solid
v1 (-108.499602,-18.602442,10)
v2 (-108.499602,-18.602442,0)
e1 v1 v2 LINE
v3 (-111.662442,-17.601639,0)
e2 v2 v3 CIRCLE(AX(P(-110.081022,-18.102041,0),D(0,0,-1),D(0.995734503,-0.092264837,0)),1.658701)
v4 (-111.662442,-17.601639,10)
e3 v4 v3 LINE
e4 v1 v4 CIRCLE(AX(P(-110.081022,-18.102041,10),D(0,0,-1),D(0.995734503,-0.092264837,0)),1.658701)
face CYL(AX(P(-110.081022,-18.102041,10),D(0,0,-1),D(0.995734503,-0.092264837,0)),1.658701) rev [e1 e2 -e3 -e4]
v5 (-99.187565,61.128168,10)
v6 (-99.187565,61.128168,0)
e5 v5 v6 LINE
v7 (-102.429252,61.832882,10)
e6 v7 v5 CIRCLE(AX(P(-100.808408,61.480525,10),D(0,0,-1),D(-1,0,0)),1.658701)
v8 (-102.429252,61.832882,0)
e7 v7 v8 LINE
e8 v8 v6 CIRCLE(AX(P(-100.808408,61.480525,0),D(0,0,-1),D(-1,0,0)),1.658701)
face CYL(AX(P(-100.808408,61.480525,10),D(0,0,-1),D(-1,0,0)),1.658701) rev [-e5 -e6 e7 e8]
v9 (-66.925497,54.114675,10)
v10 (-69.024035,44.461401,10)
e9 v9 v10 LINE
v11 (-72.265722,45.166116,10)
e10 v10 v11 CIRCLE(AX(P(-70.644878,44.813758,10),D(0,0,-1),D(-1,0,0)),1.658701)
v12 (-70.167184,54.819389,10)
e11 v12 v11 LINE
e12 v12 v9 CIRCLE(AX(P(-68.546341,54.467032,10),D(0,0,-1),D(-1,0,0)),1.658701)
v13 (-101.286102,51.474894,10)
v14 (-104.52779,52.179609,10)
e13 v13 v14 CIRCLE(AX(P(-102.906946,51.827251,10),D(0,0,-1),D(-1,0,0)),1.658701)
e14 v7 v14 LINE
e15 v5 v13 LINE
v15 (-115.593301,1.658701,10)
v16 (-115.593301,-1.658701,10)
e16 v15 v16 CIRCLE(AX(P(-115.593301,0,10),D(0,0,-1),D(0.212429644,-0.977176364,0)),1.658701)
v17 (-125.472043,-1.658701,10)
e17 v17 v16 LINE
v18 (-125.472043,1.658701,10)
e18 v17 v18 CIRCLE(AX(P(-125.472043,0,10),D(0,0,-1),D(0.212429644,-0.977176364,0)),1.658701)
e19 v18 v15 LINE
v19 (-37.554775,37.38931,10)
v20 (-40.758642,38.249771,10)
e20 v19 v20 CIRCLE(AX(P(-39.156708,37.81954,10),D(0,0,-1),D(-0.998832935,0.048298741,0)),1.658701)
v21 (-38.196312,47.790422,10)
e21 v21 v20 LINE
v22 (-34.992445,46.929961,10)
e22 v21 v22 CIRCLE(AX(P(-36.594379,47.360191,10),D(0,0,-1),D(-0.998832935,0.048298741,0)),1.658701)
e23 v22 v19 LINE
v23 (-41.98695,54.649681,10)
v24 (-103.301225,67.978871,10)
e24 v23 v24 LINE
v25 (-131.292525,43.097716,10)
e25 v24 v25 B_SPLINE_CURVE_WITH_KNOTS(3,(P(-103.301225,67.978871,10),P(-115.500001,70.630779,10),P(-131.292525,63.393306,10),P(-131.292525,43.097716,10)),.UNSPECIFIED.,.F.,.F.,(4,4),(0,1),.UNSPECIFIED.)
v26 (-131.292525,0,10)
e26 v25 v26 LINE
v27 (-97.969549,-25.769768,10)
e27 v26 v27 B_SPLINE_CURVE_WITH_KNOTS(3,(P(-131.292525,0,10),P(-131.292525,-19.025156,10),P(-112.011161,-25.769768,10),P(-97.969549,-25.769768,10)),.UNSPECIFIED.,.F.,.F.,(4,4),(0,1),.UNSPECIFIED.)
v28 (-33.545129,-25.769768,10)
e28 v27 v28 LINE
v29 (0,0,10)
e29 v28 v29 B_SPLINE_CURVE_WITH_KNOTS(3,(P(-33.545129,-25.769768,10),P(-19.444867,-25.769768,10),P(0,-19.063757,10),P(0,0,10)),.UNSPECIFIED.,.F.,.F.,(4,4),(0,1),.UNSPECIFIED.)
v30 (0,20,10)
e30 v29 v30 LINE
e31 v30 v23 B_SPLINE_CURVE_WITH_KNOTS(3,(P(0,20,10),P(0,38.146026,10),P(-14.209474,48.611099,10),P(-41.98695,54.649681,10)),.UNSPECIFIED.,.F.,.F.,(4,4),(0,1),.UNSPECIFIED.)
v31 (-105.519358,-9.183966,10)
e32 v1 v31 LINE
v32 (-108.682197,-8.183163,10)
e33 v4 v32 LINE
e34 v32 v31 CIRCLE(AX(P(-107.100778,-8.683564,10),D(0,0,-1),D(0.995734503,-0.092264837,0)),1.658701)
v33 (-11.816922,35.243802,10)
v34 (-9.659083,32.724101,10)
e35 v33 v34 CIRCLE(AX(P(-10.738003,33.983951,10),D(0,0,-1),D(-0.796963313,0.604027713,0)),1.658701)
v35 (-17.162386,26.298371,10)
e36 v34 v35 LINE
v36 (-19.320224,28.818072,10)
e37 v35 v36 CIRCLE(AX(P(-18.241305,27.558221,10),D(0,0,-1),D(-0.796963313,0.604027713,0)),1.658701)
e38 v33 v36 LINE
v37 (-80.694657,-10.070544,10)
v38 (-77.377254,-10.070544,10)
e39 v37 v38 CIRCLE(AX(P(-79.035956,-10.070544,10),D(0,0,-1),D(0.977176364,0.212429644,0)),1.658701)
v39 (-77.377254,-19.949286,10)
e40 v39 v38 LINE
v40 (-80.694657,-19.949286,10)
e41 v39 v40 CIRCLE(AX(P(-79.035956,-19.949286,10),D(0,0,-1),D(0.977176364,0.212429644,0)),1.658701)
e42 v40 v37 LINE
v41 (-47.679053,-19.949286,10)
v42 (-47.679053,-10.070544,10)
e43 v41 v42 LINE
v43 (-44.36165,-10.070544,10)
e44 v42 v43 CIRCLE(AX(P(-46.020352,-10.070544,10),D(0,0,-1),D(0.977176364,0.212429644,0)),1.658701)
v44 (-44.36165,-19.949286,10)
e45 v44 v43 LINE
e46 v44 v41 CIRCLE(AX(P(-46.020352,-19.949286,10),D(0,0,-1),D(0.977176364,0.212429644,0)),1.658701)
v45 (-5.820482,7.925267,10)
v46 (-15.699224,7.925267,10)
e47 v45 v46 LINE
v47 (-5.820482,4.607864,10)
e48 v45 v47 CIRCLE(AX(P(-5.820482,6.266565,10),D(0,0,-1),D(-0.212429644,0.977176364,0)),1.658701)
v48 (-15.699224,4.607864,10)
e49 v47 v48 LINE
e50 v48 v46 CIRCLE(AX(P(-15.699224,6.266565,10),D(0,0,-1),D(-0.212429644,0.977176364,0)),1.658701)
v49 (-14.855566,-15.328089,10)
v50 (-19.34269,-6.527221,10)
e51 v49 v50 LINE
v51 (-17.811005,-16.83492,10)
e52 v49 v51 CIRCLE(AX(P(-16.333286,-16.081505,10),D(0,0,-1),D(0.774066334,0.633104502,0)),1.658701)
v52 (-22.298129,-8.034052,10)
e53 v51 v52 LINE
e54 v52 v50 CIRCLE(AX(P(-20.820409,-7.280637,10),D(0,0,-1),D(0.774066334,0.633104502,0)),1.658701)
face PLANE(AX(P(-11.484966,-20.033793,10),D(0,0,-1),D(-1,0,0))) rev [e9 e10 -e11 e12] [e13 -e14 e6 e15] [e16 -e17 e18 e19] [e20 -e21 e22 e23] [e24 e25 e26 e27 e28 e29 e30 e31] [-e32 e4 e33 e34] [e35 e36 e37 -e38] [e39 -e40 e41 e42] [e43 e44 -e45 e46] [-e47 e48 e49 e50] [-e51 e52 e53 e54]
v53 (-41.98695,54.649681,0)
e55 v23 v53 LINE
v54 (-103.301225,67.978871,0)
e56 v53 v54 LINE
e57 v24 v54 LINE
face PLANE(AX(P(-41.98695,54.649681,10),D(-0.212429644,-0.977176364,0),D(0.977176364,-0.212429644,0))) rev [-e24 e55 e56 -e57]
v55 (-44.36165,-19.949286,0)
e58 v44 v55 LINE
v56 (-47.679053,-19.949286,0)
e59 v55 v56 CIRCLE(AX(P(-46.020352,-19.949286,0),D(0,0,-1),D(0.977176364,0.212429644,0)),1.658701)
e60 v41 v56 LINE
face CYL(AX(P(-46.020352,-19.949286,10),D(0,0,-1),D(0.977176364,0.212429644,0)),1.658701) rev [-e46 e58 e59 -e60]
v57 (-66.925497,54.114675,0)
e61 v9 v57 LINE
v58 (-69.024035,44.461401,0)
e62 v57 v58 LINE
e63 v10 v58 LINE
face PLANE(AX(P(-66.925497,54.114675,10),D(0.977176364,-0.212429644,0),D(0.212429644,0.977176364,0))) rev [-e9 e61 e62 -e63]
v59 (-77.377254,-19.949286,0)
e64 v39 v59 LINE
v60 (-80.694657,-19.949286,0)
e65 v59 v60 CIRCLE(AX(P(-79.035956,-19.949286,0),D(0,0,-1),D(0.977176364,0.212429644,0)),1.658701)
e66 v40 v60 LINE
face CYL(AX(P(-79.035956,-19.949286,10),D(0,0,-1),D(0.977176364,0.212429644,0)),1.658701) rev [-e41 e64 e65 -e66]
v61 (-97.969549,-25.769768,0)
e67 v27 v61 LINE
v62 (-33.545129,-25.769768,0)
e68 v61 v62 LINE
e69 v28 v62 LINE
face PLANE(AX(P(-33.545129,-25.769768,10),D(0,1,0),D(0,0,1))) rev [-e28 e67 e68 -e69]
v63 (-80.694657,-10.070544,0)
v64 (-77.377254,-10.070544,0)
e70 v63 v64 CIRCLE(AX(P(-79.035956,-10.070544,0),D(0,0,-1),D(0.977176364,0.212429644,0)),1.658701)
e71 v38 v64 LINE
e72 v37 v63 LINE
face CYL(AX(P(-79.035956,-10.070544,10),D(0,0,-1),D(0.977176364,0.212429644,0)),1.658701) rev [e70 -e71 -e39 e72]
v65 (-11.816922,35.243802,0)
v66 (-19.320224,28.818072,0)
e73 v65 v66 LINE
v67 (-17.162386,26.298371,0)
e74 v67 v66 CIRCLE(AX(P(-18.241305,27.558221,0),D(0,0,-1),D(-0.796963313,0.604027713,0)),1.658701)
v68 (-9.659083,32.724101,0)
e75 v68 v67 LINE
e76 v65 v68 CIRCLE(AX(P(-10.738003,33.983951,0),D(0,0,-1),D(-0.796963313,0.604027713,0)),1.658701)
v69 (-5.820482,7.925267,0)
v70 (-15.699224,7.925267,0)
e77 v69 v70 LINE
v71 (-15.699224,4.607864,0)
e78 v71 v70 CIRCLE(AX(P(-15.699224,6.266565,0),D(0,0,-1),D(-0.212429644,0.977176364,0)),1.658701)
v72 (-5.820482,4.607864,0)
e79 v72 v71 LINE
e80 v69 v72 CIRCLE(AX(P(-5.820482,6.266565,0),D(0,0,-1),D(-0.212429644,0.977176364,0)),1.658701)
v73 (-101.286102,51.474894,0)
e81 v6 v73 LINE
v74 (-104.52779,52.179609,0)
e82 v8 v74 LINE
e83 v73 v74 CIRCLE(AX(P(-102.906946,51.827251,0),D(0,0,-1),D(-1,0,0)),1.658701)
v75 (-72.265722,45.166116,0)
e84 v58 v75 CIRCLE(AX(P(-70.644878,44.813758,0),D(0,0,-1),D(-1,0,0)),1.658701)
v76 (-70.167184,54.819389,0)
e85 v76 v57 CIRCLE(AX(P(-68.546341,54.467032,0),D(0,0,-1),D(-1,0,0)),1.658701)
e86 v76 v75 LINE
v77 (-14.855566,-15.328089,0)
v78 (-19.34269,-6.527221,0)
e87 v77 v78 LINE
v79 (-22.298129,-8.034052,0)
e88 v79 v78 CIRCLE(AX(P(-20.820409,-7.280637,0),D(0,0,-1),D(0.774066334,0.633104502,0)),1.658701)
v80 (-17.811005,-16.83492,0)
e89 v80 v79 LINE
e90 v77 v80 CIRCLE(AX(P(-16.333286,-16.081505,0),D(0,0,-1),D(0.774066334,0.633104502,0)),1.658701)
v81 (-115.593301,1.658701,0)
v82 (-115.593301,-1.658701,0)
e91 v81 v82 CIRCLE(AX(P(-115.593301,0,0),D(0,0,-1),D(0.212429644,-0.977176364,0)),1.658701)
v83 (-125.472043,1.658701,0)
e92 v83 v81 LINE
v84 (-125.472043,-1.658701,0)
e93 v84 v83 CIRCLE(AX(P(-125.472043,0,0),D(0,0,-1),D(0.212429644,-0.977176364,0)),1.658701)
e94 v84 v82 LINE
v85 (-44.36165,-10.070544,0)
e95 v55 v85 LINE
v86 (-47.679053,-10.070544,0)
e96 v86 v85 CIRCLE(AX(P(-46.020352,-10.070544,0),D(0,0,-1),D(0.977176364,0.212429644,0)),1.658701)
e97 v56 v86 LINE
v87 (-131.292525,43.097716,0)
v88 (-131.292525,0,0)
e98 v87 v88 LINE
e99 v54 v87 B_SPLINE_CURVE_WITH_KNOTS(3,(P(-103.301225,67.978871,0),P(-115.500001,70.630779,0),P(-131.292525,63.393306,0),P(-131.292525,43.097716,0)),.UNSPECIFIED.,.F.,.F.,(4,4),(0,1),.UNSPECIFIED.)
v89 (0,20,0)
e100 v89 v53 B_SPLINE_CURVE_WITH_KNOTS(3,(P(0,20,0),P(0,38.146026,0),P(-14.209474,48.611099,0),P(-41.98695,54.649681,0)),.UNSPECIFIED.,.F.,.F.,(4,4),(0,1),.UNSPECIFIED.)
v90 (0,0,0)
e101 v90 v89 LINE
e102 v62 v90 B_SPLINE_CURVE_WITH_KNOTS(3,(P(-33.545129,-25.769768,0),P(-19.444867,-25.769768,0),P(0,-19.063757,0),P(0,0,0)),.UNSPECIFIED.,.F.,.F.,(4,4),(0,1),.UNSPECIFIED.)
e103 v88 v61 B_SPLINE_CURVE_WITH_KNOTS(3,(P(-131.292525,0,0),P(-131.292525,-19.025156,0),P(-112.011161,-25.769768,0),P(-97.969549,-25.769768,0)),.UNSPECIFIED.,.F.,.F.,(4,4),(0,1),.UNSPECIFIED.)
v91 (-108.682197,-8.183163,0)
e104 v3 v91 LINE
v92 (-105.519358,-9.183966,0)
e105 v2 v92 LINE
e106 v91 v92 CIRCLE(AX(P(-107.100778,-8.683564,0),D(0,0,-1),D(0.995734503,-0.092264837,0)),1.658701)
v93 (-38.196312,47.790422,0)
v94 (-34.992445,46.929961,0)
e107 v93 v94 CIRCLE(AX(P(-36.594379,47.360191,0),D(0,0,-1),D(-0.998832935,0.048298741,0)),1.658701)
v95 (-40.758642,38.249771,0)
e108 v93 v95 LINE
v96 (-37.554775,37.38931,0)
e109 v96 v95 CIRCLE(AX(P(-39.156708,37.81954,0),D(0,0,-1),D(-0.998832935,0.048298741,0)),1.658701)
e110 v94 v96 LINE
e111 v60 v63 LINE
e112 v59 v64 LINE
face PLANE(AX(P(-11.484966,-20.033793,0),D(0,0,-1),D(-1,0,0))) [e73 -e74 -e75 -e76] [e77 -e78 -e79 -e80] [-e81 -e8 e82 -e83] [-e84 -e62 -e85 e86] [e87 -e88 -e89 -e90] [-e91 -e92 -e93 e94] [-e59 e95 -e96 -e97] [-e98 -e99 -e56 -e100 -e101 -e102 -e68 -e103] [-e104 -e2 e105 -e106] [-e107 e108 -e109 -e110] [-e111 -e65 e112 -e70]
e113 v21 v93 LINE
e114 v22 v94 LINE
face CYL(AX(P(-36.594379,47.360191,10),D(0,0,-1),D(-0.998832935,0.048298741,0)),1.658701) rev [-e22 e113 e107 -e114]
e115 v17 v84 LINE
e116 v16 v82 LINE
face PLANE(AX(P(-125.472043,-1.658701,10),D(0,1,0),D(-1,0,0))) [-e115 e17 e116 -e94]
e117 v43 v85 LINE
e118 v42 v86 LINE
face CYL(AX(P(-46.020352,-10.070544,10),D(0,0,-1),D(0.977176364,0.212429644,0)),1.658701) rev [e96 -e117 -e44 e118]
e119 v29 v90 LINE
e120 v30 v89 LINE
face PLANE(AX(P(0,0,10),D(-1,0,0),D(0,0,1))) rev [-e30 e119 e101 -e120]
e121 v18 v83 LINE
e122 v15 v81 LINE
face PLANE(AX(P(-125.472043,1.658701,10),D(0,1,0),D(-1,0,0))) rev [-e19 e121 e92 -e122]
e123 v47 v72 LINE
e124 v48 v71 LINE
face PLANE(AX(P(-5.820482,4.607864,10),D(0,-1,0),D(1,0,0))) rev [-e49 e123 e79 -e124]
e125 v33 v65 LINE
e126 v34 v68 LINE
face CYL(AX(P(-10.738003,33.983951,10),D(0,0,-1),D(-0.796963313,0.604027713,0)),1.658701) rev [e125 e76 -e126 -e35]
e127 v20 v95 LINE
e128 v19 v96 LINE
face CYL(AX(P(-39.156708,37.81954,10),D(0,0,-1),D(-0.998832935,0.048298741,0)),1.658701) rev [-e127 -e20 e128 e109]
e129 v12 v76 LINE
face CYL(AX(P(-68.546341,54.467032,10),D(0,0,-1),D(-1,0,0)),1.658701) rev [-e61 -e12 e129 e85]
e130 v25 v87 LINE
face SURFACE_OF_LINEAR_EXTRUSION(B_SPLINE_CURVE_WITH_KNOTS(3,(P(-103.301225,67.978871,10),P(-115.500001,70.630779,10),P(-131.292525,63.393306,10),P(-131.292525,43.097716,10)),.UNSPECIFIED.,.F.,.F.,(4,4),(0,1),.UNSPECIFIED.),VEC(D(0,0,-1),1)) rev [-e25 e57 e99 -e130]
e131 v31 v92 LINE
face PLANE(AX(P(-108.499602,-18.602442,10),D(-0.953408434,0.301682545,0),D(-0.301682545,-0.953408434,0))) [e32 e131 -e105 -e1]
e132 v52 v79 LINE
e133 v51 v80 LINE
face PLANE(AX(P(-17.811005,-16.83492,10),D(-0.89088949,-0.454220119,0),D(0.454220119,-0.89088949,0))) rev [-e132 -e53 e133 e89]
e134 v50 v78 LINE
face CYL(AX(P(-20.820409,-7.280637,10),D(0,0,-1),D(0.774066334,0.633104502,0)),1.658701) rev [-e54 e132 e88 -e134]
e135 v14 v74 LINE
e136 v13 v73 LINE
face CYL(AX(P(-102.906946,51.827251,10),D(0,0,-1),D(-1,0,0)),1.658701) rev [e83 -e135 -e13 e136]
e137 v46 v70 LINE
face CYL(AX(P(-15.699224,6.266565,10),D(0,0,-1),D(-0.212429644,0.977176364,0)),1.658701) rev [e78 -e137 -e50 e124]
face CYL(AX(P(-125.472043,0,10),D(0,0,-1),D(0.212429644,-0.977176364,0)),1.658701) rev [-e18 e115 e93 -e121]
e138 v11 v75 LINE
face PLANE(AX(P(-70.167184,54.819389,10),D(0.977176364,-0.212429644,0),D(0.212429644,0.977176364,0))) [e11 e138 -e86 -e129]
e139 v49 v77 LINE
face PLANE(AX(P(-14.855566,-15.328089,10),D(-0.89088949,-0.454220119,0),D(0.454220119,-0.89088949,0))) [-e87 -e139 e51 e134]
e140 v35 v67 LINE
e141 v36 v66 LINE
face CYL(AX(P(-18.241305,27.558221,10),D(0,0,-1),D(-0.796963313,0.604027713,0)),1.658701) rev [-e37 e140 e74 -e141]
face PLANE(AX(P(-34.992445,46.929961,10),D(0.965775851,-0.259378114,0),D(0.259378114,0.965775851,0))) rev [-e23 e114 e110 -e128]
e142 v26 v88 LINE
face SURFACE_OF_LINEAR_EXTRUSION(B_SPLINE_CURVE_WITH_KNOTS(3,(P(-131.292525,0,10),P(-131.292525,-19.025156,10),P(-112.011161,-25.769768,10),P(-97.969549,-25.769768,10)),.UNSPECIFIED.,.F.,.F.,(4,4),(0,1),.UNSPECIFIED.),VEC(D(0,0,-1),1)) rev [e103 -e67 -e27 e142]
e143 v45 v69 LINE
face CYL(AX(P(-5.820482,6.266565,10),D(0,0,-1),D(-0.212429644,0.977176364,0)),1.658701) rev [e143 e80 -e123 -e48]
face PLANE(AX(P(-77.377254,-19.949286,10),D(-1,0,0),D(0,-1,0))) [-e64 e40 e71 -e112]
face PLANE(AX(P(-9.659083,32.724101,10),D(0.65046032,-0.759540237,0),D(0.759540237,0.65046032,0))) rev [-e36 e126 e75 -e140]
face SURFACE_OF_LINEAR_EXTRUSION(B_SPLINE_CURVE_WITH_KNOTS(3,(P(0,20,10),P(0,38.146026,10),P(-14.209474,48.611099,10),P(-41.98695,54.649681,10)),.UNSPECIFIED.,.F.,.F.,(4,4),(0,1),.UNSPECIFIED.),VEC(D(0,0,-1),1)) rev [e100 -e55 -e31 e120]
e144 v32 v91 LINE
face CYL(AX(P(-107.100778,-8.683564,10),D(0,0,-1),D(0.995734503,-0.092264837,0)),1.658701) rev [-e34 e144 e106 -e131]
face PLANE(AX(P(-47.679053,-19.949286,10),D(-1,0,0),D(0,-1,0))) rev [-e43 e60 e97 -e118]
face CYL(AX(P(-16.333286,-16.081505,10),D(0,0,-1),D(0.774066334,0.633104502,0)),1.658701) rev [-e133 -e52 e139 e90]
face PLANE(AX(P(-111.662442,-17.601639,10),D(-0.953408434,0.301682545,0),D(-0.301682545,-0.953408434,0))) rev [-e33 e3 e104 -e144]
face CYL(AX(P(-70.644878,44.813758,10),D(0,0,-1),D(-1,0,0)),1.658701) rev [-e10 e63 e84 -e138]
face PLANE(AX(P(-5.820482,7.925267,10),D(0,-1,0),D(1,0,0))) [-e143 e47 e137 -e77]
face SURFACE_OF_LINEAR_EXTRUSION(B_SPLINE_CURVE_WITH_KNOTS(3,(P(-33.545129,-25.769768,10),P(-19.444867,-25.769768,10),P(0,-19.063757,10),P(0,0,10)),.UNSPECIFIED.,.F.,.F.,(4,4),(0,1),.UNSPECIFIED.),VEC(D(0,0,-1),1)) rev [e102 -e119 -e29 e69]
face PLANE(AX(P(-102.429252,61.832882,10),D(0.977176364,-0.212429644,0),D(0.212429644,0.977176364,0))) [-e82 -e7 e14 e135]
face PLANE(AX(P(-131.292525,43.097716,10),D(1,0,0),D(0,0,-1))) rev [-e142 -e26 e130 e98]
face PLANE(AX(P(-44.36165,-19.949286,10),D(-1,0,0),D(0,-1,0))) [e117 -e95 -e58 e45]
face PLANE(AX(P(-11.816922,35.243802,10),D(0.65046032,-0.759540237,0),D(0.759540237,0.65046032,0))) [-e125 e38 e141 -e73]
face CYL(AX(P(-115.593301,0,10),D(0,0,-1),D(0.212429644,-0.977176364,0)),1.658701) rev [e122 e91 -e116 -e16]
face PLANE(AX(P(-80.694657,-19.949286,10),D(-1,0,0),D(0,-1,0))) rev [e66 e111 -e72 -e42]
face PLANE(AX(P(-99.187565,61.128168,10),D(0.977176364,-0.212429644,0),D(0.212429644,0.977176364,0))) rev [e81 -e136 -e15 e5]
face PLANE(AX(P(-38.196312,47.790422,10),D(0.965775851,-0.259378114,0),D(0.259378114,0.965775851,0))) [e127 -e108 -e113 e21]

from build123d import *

# Parameters (mm, degrees)
EXTRUDE_1_DEPTH       = 10
CUT_EXTRUDE_1_DEPTH   = 149.427210809
PATTERN_CURVE_1_DEPTH = 10


# Read off the part's stored shape, not the designer's step: Кривая1
with BuildPart() as part:
    # Эскиз1_fr → Бобышка-Вытянуть1 (new body)
    with BuildSketch(Plane.XY):
        with BuildLine():
            Line((0, 0), (0, 20))
            add(Edge.make_bspline(
                [(0, 20), (0, 38.146025899), (-14.209474182, 48.611098897), (-41.986949672, 54.649680525)],
                knots=[0, 0, 0, 0, 1, 1, 1, 1], degree=3))
            Line((-41.986949672, 54.649680525), (-103.301225383, 67.978870897))
            add(Edge.make_bspline(
                [(-103.301225383, 67.978870897), (-115.500001367, 70.63077872), (-131.292525164, 63.393306184), (-131.292525164, 43.097715536)],
                knots=[0, 0, 0, 0, 1, 1, 1, 1], degree=3))
            Line((-131.292525164, 43.097715536), (-131.292525164, 0))
            add(Edge.make_bspline(
                [(-97.969549234, -25.769768053), (-112.011160689, -25.769768053), (-131.292525164, -19.025155818), (-131.292525164, 0)],
                knots=[0, 0, 0, 0, 1, 1, 1, 1], degree=3))
            Line((-97.969549234, -25.769768053), (-33.545129103, -25.769768053))
            add(Edge.make_bspline(
                [(-33.545129103, -25.769768053), (-19.444866568, -25.769768053), (0, -19.063757455), (0, 0)],
                knots=[0, 0, 0, 0, 1, 1, 1, 1], degree=3))
        make_face()
    extrude(amount=EXTRUDE_1_DEPTH)

    # Эскиз2_fr → Вырез-Вытянуть1 (cut, through all)
    with BuildSketch(Plane(origin=(0, 0, 0), x_dir=(-1, 0, 0), z_dir=(0, 0, -1))):
        with BuildLine():
            Line((102.429251955, 61.832882372), (104.527789693, 52.179608775))
            ThreePointArc((104.527789693, 52.179608775), (103.259303337, 50.206407776), (101.286102339, 51.474894133))
            Line((101.286102339, 51.474894133), (99.1875646, 61.128167729))
            ThreePointArc((99.1875646, 61.128167729), (100.456050956, 63.101368728), (102.429251955, 61.832882372))
        make_face()
    extrude(amount=-CUT_EXTRUDE_1_DEPTH, mode=Mode.SUBTRACT)

    # Кривая1 outline → Кривая1 (cut)
    with BuildSketch(Plane.XY):
        with BuildLine():
            ThreePointArc((-66.925496948, 54.114674761), (-68.193983304, 56.08787576), (-70.167184303, 54.819389404))
            Line((-70.167184303, 54.819389404), (-72.265722041, 45.166115807))
            ThreePointArc((-72.265722041, 45.166115807), (-70.997235685, 43.192914809), (-69.024034687, 44.461401165))
            Line((-69.024034687, 44.461401165), (-66.925496948, 54.114674761))
        make_face()
        with BuildLine():
            ThreePointArc((-34.992445024, 46.929960503), (-36.164147849, 48.962124942), (-38.196312288, 47.790422117))
            Line((-38.196312288, 47.790422117), (-40.758641861, 38.249771252))
            ThreePointArc((-40.758641861, 38.249771252), (-39.586939036, 36.217606813), (-37.554774597, 37.389309638))
            Line((-37.554774597, 37.389309638), (-34.992445024, 46.929960503))
        make_face()
        with BuildLine():
            ThreePointArc((-9.659083383, 32.724100966), (-9.478152386, 35.062870683), (-11.816922103, 35.243801681))
            Line((-11.816922103, 35.243801681), (-19.320224464, 28.818071725))
            ThreePointArc((-19.320224464, 28.818071725), (-19.501155461, 26.479302007), (-17.162385743, 26.298371011))
            Line((-17.162385743, 26.298371011), (-9.659083383, 32.724100966))
        make_face()
        with BuildLine():
            ThreePointArc((-5.820481715, 4.607864038), (-4.161780443, 6.266565309), (-5.820481715, 7.925266581))
            Line((-5.820481715, 7.925266581), (-15.699224133, 7.925266581))
            ThreePointArc((-15.699224133, 7.925266581), (-17.357925405, 6.266565309), (-15.699224133, 4.607864038))
            Line((-15.699224133, 4.607864038), (-5.820481715, 4.607864038))
        make_face()
        with BuildLine():
            ThreePointArc((-17.811005152, -16.834920175), (-15.579870133, -17.559224215), (-14.855566092, -15.328089196))
            Line((-14.855566092, -15.328089196), (-19.342689651, -6.527221402))
            ThreePointArc((-19.342689651, -6.527221402), (-21.573824671, -5.802917361), (-22.298128711, -8.034052381))
            Line((-22.298128711, -8.034052381), (-17.811005152, -16.834920175))
        make_face()
        with BuildLine():
            ThreePointArc((-47.67905304, -19.949286338), (-46.020351768, -21.607987609), (-44.361650497, -19.949286338))
            Line((-44.361650497, -19.949286338), (-44.361650497, -10.070543919))
            ThreePointArc((-44.361650497, -10.070543919), (-46.020351768, -8.411842648), (-47.67905304, -10.070543919))
            Line((-47.67905304, -10.070543919), (-47.67905304, -19.949286338))
        make_face()
        with BuildLine():
            ThreePointArc((-80.694656818, -19.949286338), (-79.035955546, -21.607987609), (-77.377254274, -19.949286338))
            Line((-77.377254274, -19.949286338), (-77.377254274, -10.070543919))
            ThreePointArc((-77.377254274, -10.070543919), (-79.035955546, -8.411842648), (-80.694656818, -10.070543919))
            Line((-80.694656818, -10.070543919), (-80.694656818, -19.949286338))
        make_face()
        with BuildLine():
            ThreePointArc((-111.662441641, -17.601639491), (-110.581423079, -19.683460493), (-108.499602077, -18.602441931))
            Line((-108.499602077, -18.602441931), (-105.519357928, -9.18396559))
            ThreePointArc((-105.519357928, -9.18396559), (-106.60037649, -7.102144588), (-108.682197492, -8.18316315))
            Line((-108.682197492, -8.18316315), (-111.662441641, -17.601639491))
        make_face()
        with BuildLine():
            ThreePointArc((-125.472043449, 1.658701272), (-127.130744721, 0), (-125.472043449, -1.658701272))
            Line((-125.472043449, -1.658701272), (-115.593301031, -1.658701272))
            ThreePointArc((-115.593301031, -1.658701272), (-113.934599759, 0), (-115.593301031, 1.658701272))
            Line((-115.593301031, 1.658701272), (-125.472043449, 1.658701272))
        make_face()
    extrude(amount=PATTERN_CURVE_1_DEPTH, mode=Mode.SUBTRACT)


solid = part.part
